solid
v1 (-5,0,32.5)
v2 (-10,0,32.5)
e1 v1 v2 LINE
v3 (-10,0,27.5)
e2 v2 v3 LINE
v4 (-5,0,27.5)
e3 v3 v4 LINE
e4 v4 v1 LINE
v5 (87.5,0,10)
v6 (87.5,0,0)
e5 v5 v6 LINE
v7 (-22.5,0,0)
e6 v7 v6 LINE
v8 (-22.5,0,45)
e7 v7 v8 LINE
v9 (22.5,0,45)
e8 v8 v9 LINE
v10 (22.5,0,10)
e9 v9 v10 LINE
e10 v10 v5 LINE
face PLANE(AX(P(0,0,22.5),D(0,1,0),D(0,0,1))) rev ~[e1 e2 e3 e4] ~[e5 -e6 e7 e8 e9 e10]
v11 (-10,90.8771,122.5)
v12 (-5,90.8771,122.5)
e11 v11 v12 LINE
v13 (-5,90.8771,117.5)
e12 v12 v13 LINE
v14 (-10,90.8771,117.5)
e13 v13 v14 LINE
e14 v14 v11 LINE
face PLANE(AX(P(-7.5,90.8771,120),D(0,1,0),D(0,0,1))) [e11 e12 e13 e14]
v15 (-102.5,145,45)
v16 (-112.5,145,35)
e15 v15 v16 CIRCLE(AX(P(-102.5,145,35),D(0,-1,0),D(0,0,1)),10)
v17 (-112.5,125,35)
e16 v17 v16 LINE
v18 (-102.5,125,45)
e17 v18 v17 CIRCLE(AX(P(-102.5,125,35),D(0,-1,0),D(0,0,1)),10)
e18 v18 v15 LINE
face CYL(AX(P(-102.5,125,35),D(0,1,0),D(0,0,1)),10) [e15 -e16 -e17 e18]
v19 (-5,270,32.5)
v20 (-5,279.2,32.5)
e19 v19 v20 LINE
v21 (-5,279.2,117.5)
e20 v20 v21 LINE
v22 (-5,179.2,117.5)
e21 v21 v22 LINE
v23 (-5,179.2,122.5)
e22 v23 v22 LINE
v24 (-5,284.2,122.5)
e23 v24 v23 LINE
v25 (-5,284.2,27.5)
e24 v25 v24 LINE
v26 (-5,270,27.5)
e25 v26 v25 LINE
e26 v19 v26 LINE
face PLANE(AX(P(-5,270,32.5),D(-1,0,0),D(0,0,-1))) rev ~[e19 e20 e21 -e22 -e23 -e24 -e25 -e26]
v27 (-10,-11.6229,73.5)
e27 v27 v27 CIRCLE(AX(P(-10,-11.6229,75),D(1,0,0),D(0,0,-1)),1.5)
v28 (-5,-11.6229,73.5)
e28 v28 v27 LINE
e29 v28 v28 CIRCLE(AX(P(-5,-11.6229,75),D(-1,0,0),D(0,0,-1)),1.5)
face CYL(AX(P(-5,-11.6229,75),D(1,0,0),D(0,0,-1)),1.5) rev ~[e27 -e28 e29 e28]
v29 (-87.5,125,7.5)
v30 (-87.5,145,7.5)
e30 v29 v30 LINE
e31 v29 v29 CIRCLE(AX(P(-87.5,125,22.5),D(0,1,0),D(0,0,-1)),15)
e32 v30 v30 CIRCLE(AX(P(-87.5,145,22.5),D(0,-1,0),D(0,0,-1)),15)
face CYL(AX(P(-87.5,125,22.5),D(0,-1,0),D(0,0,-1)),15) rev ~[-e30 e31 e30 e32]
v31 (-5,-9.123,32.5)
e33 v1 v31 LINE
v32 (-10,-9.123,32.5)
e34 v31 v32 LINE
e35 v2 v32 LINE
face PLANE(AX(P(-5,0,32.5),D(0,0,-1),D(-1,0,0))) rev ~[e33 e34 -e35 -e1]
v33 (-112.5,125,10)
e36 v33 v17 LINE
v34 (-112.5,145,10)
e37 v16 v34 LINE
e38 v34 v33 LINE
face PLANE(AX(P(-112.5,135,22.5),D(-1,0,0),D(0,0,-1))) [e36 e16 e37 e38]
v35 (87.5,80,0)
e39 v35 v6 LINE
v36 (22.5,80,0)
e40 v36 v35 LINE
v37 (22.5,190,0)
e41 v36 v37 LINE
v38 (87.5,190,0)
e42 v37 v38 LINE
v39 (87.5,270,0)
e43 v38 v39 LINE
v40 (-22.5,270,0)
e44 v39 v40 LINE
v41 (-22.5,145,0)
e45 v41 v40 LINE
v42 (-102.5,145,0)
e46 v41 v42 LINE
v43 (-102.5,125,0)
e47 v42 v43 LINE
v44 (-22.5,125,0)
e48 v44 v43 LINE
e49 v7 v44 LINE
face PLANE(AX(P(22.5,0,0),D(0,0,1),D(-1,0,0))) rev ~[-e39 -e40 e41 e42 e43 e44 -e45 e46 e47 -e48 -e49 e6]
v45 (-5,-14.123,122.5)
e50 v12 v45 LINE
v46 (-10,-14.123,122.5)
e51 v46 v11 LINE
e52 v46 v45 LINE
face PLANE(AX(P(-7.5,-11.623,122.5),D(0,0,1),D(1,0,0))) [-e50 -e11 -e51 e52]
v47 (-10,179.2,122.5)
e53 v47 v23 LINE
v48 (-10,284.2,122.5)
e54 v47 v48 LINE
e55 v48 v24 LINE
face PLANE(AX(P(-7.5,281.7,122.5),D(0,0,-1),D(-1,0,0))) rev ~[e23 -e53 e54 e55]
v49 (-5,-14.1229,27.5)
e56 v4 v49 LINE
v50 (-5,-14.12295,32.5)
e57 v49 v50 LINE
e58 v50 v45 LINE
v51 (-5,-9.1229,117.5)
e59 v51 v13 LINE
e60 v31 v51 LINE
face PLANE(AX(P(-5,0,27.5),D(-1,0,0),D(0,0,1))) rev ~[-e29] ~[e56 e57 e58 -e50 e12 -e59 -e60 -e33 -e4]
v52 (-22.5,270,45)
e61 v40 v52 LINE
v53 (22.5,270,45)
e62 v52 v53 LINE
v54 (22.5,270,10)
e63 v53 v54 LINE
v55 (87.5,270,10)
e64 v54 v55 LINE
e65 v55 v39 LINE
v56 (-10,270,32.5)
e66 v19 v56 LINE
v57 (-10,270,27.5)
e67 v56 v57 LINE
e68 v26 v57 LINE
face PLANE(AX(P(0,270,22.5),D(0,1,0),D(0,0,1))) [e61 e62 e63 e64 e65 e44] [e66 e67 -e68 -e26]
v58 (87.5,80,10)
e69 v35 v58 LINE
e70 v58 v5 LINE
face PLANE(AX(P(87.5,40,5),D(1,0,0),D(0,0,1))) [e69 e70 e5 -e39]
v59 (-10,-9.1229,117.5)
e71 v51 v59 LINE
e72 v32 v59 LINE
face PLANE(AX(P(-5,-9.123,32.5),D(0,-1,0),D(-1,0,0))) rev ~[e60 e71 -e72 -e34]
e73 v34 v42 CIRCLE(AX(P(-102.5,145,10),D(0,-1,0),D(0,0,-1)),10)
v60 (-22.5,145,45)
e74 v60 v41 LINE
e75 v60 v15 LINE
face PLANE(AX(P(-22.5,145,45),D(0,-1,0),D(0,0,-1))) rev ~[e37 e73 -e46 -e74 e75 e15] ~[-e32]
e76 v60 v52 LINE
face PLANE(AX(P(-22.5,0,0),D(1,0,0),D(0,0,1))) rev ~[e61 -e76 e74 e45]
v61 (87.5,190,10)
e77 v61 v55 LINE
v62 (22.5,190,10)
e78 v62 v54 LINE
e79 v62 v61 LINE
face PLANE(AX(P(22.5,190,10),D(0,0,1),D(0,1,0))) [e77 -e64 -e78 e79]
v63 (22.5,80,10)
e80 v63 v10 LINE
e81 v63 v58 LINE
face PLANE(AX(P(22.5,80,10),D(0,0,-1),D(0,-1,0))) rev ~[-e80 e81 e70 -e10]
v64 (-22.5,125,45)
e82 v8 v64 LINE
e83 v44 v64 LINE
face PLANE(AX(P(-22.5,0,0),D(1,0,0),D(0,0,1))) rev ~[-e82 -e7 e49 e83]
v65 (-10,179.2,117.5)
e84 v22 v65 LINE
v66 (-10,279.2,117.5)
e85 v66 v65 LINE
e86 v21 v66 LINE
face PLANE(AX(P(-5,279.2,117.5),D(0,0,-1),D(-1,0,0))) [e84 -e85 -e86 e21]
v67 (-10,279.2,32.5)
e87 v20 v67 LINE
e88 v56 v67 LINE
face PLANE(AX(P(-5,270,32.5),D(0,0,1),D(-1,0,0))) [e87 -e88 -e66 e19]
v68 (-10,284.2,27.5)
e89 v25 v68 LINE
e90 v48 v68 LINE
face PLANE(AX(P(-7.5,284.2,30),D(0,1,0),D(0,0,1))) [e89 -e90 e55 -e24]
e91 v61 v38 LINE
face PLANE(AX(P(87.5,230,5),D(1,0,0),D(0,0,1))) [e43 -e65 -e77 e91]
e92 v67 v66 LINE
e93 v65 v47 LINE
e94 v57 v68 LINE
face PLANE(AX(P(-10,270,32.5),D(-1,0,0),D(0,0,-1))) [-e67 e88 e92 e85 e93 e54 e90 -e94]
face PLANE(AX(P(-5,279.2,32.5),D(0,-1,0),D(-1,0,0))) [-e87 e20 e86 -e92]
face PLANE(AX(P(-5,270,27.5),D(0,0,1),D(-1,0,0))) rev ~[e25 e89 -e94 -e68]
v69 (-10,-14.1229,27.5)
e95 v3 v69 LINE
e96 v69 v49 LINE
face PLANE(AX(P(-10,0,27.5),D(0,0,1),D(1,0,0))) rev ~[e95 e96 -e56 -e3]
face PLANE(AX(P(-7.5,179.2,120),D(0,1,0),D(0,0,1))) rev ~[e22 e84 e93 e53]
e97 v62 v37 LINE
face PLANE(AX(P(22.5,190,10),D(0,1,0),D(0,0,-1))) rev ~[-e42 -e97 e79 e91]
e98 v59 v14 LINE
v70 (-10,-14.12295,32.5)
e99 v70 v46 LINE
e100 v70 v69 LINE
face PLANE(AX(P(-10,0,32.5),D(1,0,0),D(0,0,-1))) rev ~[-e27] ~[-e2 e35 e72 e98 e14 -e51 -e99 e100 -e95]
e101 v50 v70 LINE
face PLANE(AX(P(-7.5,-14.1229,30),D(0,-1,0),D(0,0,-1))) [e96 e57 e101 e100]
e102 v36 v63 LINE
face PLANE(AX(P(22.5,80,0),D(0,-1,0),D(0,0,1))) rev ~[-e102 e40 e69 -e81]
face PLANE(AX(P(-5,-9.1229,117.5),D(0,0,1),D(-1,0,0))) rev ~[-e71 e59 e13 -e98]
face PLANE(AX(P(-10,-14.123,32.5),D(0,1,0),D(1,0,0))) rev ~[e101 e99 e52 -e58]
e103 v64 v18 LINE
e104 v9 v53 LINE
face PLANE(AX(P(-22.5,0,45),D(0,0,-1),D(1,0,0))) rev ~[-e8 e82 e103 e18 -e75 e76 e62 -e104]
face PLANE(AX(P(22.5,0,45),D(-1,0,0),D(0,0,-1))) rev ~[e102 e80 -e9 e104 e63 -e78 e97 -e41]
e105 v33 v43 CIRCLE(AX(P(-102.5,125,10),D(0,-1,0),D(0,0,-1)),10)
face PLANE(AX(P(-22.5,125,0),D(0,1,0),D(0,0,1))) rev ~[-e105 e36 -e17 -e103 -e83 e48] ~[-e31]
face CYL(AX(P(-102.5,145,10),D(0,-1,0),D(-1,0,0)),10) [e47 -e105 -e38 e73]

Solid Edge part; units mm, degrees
sketch "Sketch1" plane through (0, 0, 0) normal (0, -1, 0) x (1, 0, 0)
  line L0 (-22.5, 45) -> (22.5, 45)
  line L1 (22.5, 45) -> (22.5, 0)
  line L2 (22.5, 0) -> (-22.5, 0)
  line L3 (-22.5, 0) -> (-22.5, 45)
  dimension "D1" = 45
  dimension "D2" = 45
  dimension "D3" = 45
  dimension "D4" = 45
extrude "Protrusion1" add sketch "Sketch1" against normal blind 270
sketch "Sketch2" plane through (22.5, 276.5897, 32.5) normal (1, 0, 0) x (0, 1, 0)
  line L0 (-86.5897, -22.5) -> (-86.5897, -32.5)
  line L1 (-86.5897, -32.5) -> (-6.5897, -32.5)
  line L2 (-6.5897, -22.5) -> (-6.5897, -32.5)
  line L3 (-86.5897, -22.5) -> (-6.5897, -22.5)
  line L4 (-276.5897, -22.5) -> (-276.5897, -32.5)
  line L5 (-196.5897, -32.5) -> (-276.5897, -32.5)
  line L6 (-196.5897, -32.5) -> (-196.5897, -22.5)
  line L7 (-196.5897, -22.5) -> (-276.5897, -22.5)
  dimension "D1" = 80
  dimension "D2" = 10
  dimension "D3" = 80
  dimension "D4" = 10
extrude "ExtrudedProtrusion_3" add sketch "Sketch2" along normal blind 65
sketch "Sketch3" plane through (50, 0, 15) normal (0, -1, 0) x (1, 0, 0)
  line L0 (-60, 17.5) -> (-60, 12.5)
  line L1 (-60, 12.5) -> (-55, 12.5)
  line L2 (-55, 12.5) -> (-55, 17.5)
  line L3 (-55, 17.5) -> (-60, 17.5)
extrude "ExtrudedProtrusion_5" add sketch "Sketch3" along normal blind 14.1229
sketch "Sketch4" plane through (0, -7.0615, 32.5) normal (0, 0, 1) x (0, 1, 0)
  line L0 (-7.0615, 10) -> (-7.0615, 5)
  line L1 (-7.0615, 5) -> (-2.0615, 5)
  line L2 (-2.0615, 5) -> (-2.0615, 10)
  line L3 (-2.0615, 10) -> (-7.0615, 10)
  dimension "D1" = 5
extrude "ExtrudedProtrusion_6" add sketch "Sketch4" along normal blind 90
sketch "Sketch5" plane through (0, -9.1229, 61.3303) normal (0, 1, 0) x (0, 0, -1)
  line L0 (-61.1697, 10) -> (-61.1697, 5)
  line L1 (-61.1697, 5) -> (-56.1697, 5)
  line L2 (-56.1697, 5) -> (-56.1697, 10)
  line L3 (-56.1697, 10) -> (-61.1697, 10)
  dimension "D1" = 5
extrude "ExtrudedProtrusion_7" add sketch "Sketch5" along normal blind 100
sketch "Sketch6" plane through (50, 270, 15) normal (0, 1, 0) x (0, 0, -1)
  line L0 (-17.5, 55) -> (-12.5, 55)
  line L1 (-12.5, 55) -> (-12.5, 60)
  line L2 (-17.5, 60) -> (-12.5, 60)
  line L3 (-17.5, 55) -> (-17.5, 60)
  dimension "D1" = 5
  dimension "D2" = 5
  dimension "D3" = 12.5
  dimension "D4" = 27.5
  dimension "D5" = 12.5
extrude "ExtrudedProtrusion_8" add sketch "Sketch6" along normal blind 14.2
sketch "Sketch7" plane through (0, 377.1, 32.5) normal (0, 0, 1) x (0, 1, 0)
  line L0 (-97.9, 10) -> (-92.9, 10)
  line L1 (-92.9, 10) -> (-92.9, 5)
  line L2 (-92.9, 5) -> (-97.9, 5)
  line L3 (-97.9, 5) -> (-97.9, 10)
  dimension "D1" = 5
  dimension "D2" = 5
extrude "ExtrudedProtrusion_9" add sketch "Sketch7" along normal blind 90
sketch "Sketch8" plane through (0, 279.2, 62.5) normal (0, -1, 0) x (0, 0, 1)
  line L0 (55, 10) -> (60, 10)
  line L1 (60, 10) -> (60, 5)
  line L2 (60, 5) -> (55, 5)
  line L3 (55, 5) -> (55, 10)
  dimension "D1" = 5
  dimension "D2" = 5
extrude "ExtrudedProtrusion_10" add sketch "Sketch8" along normal blind 100
sketch "Sketch9" plane through (-22.5, 185, 15) normal (-1, 0, 0) x (0, 1, 0)
  line L0 (-60, 15) -> (-60, -30)
  line L1 (-60, -30) -> (-40, -30)
  line L2 (-40, -30) -> (-40, 15)
  line L3 (-40, 15) -> (-60, 15)
  dimension "D1" = 45
  dimension "D2" = 20
  dimension "D3" = 125
extrude "ExtrudedProtrusion_11" add sketch "Sketch9" along normal blind 90
hole "Hole_1" at (-87.5, 125, 22.5) direction (0, 1, 0) diameter 30 end up to next
fillet "Round_1" radius 10 2 edges at (-112.5, 135, 0) (-112.5, 135, 45)
hole "Hole_2" at (-5, -11.6229, 75) direction (-1, 0, 0) diameter 3 end up to next
extrude "Protrusion2" [suppressed]
